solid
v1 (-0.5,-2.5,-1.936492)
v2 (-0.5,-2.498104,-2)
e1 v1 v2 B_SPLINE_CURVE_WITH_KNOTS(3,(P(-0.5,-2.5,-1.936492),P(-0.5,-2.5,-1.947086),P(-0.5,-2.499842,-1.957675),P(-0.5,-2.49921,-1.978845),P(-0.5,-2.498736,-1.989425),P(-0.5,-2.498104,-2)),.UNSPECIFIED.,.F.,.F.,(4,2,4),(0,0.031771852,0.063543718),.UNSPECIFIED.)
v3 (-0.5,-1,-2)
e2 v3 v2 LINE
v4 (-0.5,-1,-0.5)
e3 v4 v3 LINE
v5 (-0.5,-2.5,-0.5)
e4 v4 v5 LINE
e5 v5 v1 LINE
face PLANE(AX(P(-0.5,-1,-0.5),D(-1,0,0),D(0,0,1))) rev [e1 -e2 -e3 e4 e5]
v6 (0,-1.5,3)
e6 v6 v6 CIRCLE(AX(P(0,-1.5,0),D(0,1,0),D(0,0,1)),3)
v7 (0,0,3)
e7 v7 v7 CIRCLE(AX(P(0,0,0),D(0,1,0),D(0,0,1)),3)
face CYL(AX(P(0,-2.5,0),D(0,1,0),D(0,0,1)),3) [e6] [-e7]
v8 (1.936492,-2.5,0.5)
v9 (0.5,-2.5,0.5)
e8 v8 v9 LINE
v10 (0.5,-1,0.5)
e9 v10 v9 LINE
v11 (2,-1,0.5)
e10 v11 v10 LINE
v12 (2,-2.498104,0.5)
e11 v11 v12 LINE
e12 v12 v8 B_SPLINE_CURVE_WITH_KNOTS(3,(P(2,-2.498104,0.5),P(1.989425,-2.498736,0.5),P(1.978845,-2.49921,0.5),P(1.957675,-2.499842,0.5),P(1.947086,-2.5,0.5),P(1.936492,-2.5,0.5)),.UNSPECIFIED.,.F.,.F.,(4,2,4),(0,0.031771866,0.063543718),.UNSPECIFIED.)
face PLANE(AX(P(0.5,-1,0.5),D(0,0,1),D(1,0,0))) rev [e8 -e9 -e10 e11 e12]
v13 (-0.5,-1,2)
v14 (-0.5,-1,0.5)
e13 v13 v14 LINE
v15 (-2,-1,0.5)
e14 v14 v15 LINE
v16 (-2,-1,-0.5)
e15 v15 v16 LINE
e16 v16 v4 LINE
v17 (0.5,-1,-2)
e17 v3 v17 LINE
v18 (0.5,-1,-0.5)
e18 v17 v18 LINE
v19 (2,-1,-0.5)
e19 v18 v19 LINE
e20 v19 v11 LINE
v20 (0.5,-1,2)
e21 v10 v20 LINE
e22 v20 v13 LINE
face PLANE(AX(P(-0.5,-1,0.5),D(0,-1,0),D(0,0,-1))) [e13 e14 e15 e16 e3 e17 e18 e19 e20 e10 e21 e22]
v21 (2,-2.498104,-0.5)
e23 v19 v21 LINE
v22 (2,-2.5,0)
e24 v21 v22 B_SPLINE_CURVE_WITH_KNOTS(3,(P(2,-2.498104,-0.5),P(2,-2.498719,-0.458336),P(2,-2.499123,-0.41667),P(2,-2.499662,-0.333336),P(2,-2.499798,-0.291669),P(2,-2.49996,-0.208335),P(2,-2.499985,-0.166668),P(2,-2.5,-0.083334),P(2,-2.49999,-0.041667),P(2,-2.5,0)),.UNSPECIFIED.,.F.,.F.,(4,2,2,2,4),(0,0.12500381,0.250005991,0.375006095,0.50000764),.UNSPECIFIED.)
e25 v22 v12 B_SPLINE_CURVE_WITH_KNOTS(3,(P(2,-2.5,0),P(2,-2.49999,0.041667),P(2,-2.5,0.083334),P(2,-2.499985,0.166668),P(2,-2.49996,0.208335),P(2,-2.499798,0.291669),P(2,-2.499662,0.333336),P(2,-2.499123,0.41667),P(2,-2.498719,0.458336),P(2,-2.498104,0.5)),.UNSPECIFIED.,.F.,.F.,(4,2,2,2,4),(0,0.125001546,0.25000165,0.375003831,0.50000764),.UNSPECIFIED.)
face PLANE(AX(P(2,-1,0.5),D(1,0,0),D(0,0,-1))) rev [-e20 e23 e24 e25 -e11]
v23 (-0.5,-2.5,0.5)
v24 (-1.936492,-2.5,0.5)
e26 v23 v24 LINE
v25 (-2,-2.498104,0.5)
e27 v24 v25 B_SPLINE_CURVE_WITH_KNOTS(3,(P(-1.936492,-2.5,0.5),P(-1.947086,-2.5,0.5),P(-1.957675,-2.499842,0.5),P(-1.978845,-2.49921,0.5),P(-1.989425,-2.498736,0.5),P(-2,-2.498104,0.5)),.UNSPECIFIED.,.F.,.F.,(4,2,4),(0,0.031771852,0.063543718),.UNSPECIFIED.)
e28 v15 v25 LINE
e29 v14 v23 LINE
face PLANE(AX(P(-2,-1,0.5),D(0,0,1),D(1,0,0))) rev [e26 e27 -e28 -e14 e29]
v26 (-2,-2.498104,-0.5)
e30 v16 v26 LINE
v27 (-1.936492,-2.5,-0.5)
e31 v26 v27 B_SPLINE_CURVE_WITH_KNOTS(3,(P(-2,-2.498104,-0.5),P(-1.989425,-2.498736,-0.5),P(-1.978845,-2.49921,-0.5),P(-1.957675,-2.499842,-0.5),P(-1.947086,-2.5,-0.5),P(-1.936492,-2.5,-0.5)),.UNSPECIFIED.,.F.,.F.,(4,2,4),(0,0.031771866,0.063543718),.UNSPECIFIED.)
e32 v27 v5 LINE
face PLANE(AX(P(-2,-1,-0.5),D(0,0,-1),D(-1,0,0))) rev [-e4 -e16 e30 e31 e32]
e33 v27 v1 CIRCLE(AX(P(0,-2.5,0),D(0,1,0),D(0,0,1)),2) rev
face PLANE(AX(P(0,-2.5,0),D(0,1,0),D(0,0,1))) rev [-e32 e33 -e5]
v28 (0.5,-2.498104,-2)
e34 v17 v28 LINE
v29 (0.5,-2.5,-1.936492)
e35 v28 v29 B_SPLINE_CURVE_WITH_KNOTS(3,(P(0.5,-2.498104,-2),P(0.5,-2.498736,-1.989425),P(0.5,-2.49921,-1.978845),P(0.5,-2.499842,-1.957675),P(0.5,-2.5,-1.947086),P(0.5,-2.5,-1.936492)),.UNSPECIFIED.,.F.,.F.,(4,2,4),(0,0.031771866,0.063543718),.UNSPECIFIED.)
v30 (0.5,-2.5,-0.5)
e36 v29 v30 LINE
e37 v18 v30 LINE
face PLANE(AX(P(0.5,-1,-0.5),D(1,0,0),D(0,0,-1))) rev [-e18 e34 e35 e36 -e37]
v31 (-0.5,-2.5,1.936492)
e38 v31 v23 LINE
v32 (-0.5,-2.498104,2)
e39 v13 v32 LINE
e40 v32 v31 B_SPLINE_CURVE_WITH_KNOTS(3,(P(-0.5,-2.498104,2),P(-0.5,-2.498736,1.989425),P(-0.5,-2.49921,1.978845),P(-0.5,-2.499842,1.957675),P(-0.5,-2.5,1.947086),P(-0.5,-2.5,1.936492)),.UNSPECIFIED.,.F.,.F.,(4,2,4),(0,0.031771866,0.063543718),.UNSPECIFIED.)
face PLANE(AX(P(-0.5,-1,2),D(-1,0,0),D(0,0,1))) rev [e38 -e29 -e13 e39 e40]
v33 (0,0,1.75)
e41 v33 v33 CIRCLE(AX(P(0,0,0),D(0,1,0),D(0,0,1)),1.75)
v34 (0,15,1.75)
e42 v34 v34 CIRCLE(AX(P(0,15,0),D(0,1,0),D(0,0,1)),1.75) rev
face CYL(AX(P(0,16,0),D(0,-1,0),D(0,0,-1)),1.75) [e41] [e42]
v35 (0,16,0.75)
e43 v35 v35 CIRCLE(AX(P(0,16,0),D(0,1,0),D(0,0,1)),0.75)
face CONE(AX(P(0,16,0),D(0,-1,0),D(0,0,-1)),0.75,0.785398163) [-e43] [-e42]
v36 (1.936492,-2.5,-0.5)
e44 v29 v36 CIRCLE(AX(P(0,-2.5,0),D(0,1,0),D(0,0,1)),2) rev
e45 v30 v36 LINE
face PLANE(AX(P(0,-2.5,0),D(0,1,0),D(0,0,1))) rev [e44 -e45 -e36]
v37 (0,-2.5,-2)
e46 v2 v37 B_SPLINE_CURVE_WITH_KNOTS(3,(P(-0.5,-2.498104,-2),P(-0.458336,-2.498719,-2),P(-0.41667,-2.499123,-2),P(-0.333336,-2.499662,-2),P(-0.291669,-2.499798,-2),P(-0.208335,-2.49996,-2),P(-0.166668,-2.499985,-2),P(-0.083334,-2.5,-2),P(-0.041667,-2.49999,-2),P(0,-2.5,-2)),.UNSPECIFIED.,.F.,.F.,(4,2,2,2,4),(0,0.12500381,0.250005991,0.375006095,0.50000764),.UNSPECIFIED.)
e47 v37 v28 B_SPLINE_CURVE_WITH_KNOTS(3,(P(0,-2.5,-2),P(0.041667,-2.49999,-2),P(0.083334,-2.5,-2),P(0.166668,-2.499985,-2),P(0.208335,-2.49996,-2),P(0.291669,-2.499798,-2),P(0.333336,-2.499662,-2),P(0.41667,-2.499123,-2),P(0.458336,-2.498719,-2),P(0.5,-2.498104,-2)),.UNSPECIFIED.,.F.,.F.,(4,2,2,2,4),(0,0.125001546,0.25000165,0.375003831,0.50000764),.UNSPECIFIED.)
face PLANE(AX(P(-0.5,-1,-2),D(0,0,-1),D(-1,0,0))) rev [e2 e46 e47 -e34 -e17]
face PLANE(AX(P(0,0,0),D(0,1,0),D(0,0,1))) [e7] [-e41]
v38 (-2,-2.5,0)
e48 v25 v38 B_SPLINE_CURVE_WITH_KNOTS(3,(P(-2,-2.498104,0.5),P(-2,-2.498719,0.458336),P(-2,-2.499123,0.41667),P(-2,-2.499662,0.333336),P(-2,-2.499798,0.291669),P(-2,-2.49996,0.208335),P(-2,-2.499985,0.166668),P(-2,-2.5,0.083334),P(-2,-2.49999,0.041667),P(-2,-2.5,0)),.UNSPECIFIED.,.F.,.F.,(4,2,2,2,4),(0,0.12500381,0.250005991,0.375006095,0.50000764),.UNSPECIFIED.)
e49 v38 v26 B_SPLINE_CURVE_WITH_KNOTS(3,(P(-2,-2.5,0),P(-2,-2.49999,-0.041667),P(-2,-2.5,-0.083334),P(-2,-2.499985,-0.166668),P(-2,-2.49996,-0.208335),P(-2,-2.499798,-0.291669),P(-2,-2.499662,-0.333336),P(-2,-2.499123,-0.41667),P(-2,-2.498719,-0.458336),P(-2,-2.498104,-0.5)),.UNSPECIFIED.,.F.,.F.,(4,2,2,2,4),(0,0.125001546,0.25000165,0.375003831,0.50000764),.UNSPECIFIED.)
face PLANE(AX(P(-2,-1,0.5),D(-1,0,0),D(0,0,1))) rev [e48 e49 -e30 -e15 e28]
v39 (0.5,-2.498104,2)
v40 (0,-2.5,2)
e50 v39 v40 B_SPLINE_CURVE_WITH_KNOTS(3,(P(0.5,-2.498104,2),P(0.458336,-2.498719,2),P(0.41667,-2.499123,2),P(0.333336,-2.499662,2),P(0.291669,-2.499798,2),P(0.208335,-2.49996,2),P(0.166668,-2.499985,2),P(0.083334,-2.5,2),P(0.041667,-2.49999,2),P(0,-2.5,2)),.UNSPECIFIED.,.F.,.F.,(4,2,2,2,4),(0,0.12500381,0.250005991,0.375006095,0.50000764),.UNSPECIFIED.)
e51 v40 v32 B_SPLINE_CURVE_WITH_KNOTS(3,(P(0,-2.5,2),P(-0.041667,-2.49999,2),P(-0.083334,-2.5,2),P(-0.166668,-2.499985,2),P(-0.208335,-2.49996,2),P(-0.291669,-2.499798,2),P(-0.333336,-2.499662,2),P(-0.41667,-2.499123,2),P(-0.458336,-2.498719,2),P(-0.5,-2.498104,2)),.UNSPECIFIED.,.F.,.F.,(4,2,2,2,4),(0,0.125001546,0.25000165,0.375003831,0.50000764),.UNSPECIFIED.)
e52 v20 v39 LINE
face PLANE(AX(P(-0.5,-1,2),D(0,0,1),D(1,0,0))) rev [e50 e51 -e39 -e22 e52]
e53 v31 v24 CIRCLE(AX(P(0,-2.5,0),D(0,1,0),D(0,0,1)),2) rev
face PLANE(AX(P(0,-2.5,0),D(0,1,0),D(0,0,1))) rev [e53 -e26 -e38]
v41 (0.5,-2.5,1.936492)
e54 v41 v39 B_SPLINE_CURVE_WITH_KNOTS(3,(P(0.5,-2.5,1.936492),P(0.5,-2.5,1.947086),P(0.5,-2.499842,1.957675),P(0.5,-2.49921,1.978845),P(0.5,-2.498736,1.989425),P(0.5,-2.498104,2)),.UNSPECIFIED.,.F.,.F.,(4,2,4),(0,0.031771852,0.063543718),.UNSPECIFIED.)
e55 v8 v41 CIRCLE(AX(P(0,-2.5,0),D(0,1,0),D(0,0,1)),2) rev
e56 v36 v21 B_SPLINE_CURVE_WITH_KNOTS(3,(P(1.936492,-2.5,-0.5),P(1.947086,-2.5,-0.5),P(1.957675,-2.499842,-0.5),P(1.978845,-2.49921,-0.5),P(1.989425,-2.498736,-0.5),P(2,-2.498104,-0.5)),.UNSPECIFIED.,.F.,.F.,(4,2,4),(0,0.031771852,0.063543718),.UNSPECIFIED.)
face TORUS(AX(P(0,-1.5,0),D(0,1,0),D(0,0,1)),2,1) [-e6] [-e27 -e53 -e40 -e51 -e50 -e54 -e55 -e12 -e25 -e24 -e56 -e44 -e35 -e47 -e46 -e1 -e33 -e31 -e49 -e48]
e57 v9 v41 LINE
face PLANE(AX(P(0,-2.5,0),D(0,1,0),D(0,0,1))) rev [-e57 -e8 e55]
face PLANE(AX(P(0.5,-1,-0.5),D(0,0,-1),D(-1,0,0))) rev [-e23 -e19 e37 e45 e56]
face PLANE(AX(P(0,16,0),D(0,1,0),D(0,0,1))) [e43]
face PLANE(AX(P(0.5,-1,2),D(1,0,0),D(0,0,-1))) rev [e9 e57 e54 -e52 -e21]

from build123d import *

# Parameters (mm, degrees)
SKIZZE1_R                       = 1.75
AUFSATZ_LINEAR_AUSTRAGEN1_DEPTH = 16
SKIZZE2_R                       = 3
AUFSATZ_LINEAR_AUSTRAGEN2_DEPTH = 2.5
SCHNITT_LINEAR_AUSTRAGEN1_DEPTH = 1.5
VERRUNDUNG1_R                   = 1
FASE1_SIZE                      = 1


with BuildPart() as part:
    # Skizze1 → Aufsatz-Linear austragen1 (new body)
    with BuildSketch(Plane(origin=(0, 0, 0), x_dir=(1, 0, 0), z_dir=(0, 1, 0))):
        with Locations(Location((0, 0, 0), (0, 0, 270))):
            Circle(SKIZZE1_R)
    extrude(amount=AUFSATZ_LINEAR_AUSTRAGEN1_DEPTH)

    # Skizze2 → Aufsatz-Linear austragen2 (add)
    with BuildSketch(Plane(origin=(0, 0, 0), x_dir=(1, 0, 0), z_dir=(0, 1, 0))):
        with Locations(Location((0, 0, 0), (0, 0, 270))):
            Circle(SKIZZE2_R)
    extrude(amount=-AUFSATZ_LINEAR_AUSTRAGEN2_DEPTH)

    # Skizze3 → Schnitt-Linear austragen1 (cut)
    with BuildSketch(Plane.XZ.offset(2.5)):
        Polygon((-0.5, 2), (0.5, 2), (0.5, 0.5), (2, 0.5), (2, -0.5), (0.5, -0.5), (0.5, -2), (-0.5, -2), (-0.5, -0.5), (-2, -0.5), (-2, 0.5), (-0.5, 0.5), align=None)
    extrude(amount=-SCHNITT_LINEAR_AUSTRAGEN1_DEPTH, mode=Mode.SUBTRACT)

    # Verrundung1
    # the kernel refuses this fillet: 1 mm, written as the material it takes off along each edge
    with BuildSketch(Plane(origin=(0, -2.5, 0), x_dir=(0, 0, 1), z_dir=(-1, 0, 0))) as verrundung1_piece_1:
        with BuildLine():
            CenterArc((3 - VERRUNDUNG1_R, VERRUNDUNG1_R), VERRUNDUNG1_R, 270, 90)
            Line((3 - VERRUNDUNG1_R, 0), (3, 0))
            Line((3, 0), (3, VERRUNDUNG1_R))
        make_face()
    revolve(axis=Axis((0, -2.5, 0), (0, 1, 0)), mode=Mode.SUBTRACT)

    # Fase1
    fase1_edges = [part.edges().sort_by_distance(p)[0] for p in [
        (0, 16, -1.75),
    ]]
    chamfer(fase1_edges, length=FASE1_SIZE)


solid = part.part
